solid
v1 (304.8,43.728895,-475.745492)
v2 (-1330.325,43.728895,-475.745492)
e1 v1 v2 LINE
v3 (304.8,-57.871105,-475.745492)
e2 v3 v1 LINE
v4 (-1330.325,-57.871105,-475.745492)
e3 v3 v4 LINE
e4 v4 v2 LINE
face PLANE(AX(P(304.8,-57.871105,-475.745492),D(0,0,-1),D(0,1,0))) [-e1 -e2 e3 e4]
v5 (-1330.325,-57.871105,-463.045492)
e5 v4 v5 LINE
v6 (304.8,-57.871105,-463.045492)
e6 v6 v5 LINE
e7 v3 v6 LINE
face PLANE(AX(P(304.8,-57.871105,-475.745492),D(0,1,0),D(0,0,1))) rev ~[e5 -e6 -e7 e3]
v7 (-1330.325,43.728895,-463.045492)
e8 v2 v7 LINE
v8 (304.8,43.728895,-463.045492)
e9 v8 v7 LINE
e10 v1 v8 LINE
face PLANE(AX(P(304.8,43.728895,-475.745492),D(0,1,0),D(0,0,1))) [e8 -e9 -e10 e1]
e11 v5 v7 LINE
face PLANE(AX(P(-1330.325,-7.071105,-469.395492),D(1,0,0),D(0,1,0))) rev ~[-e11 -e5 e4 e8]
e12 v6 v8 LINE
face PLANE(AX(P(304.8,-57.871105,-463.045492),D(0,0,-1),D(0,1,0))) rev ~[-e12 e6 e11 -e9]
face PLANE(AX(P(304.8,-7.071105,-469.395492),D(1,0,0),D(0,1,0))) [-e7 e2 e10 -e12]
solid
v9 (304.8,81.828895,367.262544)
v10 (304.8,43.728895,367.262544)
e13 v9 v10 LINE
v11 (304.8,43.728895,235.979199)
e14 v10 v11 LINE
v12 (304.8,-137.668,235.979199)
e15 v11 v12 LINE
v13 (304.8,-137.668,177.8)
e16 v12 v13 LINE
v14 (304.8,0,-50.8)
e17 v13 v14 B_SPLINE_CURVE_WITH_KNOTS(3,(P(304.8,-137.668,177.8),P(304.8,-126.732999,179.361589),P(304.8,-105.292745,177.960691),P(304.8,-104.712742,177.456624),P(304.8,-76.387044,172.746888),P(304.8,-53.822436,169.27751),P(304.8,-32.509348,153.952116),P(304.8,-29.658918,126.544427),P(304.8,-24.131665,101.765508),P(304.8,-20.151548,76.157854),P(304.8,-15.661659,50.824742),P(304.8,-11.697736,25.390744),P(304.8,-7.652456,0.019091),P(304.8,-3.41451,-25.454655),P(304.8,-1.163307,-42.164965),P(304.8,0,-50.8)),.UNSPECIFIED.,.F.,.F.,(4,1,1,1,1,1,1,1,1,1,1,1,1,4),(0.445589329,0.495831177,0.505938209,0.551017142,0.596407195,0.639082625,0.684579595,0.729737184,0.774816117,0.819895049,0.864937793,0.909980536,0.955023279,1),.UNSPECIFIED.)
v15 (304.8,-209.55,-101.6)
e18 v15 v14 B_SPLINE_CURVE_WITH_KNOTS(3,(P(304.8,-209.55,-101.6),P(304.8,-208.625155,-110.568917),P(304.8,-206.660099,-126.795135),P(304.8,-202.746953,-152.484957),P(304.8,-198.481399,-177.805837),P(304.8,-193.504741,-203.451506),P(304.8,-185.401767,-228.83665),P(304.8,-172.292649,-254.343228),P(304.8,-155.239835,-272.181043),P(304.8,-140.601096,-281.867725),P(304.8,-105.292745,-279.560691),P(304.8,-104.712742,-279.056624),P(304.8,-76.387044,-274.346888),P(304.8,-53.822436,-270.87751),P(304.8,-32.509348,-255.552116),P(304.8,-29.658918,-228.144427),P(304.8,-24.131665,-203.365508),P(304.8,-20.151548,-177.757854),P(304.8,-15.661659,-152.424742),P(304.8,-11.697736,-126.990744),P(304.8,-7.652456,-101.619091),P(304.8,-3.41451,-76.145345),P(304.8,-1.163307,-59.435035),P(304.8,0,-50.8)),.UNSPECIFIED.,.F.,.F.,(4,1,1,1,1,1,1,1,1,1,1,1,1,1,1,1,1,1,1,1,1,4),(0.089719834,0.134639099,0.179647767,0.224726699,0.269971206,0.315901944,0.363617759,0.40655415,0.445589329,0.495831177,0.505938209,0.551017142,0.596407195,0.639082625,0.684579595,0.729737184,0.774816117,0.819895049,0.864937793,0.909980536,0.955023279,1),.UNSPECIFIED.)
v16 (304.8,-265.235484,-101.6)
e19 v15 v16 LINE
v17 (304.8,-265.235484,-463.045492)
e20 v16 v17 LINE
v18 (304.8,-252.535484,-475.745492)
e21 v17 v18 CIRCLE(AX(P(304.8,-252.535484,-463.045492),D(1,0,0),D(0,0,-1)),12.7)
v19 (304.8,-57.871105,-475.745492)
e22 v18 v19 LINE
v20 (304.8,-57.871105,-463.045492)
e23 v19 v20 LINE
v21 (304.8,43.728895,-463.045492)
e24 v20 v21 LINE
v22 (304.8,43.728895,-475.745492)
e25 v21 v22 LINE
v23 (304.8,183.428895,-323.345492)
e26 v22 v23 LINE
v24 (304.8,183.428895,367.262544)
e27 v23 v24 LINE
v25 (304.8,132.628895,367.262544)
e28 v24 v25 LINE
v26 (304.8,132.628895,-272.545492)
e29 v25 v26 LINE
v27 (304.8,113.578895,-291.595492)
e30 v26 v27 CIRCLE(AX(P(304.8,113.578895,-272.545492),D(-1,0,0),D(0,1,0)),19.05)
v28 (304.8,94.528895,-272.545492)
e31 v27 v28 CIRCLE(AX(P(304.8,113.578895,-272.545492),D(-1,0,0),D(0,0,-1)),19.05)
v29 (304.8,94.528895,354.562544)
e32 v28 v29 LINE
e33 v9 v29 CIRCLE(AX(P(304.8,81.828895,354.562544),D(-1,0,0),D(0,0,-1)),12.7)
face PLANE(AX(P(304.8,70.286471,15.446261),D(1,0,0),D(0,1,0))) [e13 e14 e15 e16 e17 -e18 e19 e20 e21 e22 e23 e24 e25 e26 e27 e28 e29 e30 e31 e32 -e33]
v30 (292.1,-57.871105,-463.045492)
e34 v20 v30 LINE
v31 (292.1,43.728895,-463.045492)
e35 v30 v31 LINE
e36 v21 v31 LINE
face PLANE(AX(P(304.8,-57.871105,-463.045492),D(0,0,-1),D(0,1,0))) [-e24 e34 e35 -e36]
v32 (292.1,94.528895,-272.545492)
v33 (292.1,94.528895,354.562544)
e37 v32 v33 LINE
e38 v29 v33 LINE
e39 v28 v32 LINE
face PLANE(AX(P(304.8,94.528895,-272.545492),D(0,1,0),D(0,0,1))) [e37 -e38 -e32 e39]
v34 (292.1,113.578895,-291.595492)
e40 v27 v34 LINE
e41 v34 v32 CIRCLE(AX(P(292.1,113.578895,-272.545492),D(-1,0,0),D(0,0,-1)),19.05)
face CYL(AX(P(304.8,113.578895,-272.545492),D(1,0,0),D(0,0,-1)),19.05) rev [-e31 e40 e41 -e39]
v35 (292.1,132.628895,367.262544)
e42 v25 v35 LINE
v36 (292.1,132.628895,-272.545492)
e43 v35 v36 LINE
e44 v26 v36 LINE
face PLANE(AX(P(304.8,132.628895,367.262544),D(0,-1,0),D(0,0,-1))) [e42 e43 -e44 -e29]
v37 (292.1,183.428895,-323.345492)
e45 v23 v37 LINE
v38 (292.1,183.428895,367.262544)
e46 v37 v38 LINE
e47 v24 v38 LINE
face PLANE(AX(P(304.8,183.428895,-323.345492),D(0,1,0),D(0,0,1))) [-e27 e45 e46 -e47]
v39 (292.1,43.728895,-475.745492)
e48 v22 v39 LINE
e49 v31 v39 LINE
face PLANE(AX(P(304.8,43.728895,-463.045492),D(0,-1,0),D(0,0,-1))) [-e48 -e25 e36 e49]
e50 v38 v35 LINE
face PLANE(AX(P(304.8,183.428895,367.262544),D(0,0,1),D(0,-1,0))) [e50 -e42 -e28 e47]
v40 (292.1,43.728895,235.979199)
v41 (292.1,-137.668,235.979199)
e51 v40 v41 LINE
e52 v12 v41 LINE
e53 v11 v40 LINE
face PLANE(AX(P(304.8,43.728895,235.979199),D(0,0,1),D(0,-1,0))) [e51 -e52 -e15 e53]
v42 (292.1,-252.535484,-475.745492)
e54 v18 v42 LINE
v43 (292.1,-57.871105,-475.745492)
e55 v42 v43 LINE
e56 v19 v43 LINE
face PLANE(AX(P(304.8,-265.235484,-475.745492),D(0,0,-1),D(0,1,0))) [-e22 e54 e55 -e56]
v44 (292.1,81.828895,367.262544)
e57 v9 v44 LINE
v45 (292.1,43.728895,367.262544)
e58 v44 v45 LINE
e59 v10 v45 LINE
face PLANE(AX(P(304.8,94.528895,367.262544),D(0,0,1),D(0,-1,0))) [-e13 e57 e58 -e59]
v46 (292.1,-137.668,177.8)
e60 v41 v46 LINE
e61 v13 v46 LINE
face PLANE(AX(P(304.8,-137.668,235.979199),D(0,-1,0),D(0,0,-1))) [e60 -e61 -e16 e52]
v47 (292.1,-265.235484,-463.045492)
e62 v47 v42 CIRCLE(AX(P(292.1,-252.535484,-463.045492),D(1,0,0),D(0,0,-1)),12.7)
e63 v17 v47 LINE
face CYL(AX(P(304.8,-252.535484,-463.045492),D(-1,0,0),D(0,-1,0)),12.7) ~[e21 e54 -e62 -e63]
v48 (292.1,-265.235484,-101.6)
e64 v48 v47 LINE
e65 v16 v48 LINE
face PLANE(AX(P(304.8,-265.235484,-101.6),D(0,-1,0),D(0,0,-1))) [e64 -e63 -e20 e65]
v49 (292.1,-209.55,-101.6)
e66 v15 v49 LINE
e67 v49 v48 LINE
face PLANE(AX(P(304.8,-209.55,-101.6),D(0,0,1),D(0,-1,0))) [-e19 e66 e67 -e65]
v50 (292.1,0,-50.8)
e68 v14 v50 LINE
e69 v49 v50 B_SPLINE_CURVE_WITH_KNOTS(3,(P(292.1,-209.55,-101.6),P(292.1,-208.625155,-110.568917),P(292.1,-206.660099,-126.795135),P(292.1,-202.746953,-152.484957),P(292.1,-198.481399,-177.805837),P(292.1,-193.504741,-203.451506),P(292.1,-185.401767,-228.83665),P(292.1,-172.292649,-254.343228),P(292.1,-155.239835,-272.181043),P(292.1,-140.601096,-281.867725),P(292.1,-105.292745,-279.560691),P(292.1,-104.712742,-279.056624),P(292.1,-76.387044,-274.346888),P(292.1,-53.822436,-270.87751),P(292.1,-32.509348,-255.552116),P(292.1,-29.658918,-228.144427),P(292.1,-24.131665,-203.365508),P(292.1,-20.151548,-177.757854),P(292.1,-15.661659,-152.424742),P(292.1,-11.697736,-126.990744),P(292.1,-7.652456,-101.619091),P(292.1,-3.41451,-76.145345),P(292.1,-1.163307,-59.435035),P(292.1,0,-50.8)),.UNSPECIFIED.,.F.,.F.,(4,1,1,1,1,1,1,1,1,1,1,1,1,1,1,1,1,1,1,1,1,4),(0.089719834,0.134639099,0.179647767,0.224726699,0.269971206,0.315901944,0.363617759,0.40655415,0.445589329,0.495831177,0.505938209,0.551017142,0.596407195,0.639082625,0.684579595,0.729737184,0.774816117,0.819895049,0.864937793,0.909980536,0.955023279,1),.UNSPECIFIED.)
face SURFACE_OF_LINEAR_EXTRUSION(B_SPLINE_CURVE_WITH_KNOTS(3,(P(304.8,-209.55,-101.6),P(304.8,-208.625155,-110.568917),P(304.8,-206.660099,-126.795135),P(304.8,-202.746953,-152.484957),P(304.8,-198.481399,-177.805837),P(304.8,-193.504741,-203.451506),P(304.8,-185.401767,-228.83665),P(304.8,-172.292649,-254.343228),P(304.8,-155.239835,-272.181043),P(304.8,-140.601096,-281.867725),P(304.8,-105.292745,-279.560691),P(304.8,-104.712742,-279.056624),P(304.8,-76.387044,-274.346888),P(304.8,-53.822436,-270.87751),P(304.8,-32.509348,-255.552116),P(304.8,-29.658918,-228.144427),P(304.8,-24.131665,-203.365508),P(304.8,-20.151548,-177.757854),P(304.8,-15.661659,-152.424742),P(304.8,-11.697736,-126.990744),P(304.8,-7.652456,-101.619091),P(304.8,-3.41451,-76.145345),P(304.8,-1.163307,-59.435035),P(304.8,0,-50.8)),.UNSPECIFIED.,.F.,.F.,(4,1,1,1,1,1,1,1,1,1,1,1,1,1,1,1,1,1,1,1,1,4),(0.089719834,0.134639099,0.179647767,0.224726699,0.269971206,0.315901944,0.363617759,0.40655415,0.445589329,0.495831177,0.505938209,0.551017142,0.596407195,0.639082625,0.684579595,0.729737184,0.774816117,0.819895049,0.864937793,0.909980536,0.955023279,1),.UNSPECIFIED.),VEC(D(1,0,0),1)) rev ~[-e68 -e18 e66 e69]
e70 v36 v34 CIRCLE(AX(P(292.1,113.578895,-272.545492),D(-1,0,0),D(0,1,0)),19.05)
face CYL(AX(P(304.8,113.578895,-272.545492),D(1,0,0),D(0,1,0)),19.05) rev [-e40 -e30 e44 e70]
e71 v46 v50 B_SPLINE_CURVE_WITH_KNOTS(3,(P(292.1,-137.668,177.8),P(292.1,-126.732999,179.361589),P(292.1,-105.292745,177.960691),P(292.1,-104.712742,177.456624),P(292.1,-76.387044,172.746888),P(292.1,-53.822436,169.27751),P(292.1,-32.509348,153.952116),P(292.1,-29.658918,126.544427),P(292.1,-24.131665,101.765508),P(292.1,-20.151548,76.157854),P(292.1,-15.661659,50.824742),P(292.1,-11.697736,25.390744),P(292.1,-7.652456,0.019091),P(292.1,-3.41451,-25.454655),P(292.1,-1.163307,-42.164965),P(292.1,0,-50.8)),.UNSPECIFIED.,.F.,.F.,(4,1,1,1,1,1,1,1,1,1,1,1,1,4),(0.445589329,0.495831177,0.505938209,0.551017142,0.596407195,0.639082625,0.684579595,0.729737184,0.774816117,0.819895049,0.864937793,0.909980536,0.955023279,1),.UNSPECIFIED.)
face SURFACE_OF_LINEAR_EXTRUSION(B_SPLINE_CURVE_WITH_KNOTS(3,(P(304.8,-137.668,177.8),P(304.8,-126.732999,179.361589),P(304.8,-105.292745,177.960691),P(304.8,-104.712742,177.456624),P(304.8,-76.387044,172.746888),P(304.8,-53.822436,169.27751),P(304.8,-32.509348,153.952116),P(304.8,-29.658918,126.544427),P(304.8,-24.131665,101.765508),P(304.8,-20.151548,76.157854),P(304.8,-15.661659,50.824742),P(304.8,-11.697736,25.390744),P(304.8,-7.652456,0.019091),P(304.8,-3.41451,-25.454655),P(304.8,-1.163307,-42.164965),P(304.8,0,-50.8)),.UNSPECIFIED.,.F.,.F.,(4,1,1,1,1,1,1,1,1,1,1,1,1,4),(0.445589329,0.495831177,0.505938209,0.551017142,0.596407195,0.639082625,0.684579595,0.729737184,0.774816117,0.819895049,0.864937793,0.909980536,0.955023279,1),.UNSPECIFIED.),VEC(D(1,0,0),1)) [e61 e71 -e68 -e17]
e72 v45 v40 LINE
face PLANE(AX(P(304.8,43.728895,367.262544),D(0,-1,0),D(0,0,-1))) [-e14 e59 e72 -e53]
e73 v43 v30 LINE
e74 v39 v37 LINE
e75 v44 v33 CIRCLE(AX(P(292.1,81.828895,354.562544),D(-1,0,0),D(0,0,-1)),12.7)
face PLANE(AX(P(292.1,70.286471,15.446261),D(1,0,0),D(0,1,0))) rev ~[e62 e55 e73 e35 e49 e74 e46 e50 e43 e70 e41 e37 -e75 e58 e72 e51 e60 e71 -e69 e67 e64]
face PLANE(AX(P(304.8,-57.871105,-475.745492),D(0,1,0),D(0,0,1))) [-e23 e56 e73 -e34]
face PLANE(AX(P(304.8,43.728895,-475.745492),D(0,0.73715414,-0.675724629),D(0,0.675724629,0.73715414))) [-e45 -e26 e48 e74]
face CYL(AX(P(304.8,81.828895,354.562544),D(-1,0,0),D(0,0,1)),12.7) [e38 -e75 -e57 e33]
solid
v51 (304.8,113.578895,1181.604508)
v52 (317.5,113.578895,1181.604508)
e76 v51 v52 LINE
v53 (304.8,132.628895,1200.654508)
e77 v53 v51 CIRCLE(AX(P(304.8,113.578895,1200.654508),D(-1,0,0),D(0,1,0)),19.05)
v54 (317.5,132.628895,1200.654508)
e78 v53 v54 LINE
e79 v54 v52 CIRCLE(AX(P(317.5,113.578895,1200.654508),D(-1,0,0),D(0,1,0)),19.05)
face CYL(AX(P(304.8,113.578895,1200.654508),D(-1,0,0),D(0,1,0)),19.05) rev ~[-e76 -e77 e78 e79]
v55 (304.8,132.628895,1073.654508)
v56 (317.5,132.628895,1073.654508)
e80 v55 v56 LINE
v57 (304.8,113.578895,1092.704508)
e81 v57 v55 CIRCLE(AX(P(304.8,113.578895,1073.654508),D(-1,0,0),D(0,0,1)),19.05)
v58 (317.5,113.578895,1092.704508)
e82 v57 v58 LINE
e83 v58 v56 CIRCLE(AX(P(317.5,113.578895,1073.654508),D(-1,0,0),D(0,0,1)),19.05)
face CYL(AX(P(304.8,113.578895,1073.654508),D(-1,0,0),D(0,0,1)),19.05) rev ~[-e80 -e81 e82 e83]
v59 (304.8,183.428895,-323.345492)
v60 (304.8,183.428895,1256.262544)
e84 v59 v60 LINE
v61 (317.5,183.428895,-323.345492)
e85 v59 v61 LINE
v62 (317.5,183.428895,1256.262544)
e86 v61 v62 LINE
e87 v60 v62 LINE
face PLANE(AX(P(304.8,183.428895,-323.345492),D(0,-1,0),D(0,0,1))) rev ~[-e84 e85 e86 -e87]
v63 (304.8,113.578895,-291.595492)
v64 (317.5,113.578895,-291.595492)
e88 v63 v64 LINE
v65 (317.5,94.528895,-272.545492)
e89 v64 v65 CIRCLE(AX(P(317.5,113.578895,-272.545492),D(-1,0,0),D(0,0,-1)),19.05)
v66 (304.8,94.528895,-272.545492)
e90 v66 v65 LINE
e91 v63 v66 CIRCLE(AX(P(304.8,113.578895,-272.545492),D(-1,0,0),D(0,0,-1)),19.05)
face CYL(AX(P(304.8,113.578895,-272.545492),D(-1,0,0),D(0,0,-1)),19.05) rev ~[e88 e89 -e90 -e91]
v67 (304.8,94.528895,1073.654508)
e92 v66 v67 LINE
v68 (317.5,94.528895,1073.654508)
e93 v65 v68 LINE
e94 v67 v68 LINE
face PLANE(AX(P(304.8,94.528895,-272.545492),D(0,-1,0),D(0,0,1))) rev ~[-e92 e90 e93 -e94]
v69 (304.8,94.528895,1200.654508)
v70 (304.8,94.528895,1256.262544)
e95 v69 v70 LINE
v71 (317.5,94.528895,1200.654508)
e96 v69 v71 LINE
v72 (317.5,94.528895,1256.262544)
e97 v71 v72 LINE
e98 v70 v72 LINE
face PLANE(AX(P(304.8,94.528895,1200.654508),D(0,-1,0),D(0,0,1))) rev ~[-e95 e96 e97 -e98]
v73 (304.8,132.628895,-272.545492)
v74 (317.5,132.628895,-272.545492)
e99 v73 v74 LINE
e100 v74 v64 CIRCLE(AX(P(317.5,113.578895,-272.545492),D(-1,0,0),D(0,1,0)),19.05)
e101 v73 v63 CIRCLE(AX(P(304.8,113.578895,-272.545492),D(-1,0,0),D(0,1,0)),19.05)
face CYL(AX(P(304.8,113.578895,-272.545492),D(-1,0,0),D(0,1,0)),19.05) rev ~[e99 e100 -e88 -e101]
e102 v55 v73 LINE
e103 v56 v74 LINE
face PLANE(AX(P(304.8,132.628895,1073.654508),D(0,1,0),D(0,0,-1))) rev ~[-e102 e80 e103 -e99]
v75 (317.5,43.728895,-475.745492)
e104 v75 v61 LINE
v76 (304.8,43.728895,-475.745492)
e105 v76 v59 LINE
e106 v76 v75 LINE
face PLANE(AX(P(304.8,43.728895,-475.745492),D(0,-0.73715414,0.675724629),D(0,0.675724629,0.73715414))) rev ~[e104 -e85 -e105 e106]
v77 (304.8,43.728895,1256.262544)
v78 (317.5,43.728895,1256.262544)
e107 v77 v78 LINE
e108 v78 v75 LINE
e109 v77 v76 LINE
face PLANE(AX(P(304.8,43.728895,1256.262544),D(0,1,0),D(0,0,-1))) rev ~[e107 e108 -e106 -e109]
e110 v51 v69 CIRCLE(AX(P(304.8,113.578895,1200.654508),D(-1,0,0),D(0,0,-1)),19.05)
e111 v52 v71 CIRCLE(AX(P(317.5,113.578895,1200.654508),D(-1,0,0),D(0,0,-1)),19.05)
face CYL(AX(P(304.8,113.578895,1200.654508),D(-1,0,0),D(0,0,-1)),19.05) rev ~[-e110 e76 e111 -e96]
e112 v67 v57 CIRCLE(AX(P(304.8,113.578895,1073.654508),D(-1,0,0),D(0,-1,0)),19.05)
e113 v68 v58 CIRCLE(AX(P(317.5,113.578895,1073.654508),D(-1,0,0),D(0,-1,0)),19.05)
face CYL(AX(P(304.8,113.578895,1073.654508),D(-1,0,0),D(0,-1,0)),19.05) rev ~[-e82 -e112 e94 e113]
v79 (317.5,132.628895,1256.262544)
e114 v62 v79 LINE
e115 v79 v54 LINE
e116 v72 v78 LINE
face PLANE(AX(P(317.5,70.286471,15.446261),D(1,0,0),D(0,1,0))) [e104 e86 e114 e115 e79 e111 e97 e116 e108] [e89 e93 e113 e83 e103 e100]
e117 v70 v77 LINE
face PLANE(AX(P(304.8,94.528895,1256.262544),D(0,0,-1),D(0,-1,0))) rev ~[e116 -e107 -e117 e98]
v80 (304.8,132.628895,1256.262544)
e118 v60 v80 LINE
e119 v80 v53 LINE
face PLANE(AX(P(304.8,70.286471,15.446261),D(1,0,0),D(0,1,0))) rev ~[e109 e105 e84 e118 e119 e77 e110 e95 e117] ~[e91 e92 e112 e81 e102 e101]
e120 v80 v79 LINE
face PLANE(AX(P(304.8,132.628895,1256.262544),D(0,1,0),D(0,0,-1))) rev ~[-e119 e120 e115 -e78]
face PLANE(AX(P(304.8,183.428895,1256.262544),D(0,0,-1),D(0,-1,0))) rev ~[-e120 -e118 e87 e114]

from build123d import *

# Parameters (mm, degrees)
F2_DEPTH = 12.7
F3_DEPTH = 12.7
F4_R     = 12.7
F1_W     = 101.6
F1_H     = 12.7
F5_DEPTH = 1635.125


# Not quite as in the source:
# - a feature names something its author has since deleted; it is built from what else it names


with BuildPart() as f2:
    # F1 (on offset) → F2 (new body)
    with BuildSketch(Plane.YZ.offset(304.8)):
        with BuildLine():
            Line((94.5288948266, 367.2625439401), (43.7288948266, 367.2625439401))
            Line((43.7288948266, 367.2625439401), (43.7288948266, 235.9791994095))
            Line((43.7288948266, 235.9791994095), (43.7288948266, -323.3454918831))
            Line((43.7288948266, -323.3454918831), (113.5788948266, -323.3454918831))
            Line((113.5788948266, -323.3454918831), (113.5788948266, -291.5954918831))
            ThreePointArc((113.5788948266, -291.5954918831), (100.108510645, -286.0158760647), (94.5288948266, -272.5454918831))
            Line((94.5288948266, -272.5454918831), (94.5288948266, 367.2625439401))
        make_face()
        with BuildLine():
            Line((113.5788948266, -291.5954918831), (113.5788948266, -323.3454918831))
            Line((113.5788948266, -323.3454918831), (183.4288948266, -323.3454918831))
            Line((183.4288948266, -323.3454918831), (183.4288948266, 367.2625439401))
            Line((183.4288948266, 367.2625439401), (132.6288948266, 367.2625439401))
            Line((132.6288948266, 367.2625439401), (132.6288948266, -272.5454918831))
            ThreePointArc((132.6288948266, -272.5454918831), (127.0492790082, -286.0158760647), (113.5788948266, -291.5954918831))
        make_face()
        Polygon((113.5788948266, -323.3454918831), (43.7288948266, -323.3454918831), (43.7288948266, -463.0454918831), (43.7288948266, -475.7454918831), (183.4288948266, -323.3454918831), align=None)
        with BuildLine():
            Line((43.7288948266, 1256.2625439401), (43.7288948266, 367.2625439401))
            Line((43.7288948266, 367.2625439401), (94.5288948266, 367.2625439401))
            Line((94.5288948266, 367.2625439401), (94.5288948266, 1073.6545081169))
            ThreePointArc((94.5288948266, 1073.6545081169), (100.108510645, 1087.1248922985), (113.5788948266, 1092.7045081169))
            Line((113.5788948266, 1092.7045081169), (113.5788948266, 1181.6045081169))
            ThreePointArc((113.5788948266, 1181.6045081169), (100.108510645, 1187.1841239353), (94.5288948266, 1200.6545081169))
            Line((94.5288948266, 1200.6545081169), (94.5288948266, 1256.2625439401))
            Line((94.5288948266, 1256.2625439401), (43.7288948266, 1256.2625439401))
        make_face()
        with BuildLine():
            Line((113.5788948266, 1181.6045081169), (113.5788948266, 1092.7045081169))
            ThreePointArc((113.5788948266, 1092.7045081169), (127.0492790082, 1087.1248922985), (132.6288948266, 1073.6545081169))
            Line((132.6288948266, 1073.6545081169), (132.6288948266, 367.2625439401))
            Line((132.6288948266, 367.2625439401), (183.4288948266, 367.2625439401))
            Line((183.4288948266, 367.2625439401), (183.4288948266, 1256.2625439401))
            Line((183.4288948266, 1256.2625439401), (132.6288948266, 1256.2625439401))
            Line((132.6288948266, 1256.2625439401), (132.6288948266, 1200.6545081169))
            ThreePointArc((132.6288948266, 1200.6545081169), (127.0492790082, 1187.1841239353), (113.5788948266, 1181.6045081169))
        make_face()
    extrude(amount=F2_DEPTH)


with BuildPart() as f3:
    # F1 (on offset) → F3 (new body)
    with BuildSketch(Plane.YZ.offset(304.8)):
        with BuildLine():
            Line((94.5288948266, 367.2625439401), (43.7288948266, 367.2625439401))
            Line((43.7288948266, 367.2625439401), (43.7288948266, 235.9791994095))
            Line((43.7288948266, 235.9791994095), (43.7288948266, -323.3454918831))
            Line((43.7288948266, -323.3454918831), (113.5788948266, -323.3454918831))
            Line((113.5788948266, -323.3454918831), (113.5788948266, -291.5954918831))
            ThreePointArc((113.5788948266, -291.5954918831), (100.108510645, -286.0158760647), (94.5288948266, -272.5454918831))
            Line((94.5288948266, -272.5454918831), (94.5288948266, 367.2625439401))
        make_face()
        with BuildLine():
            Line((113.5788948266, -291.5954918831), (113.5788948266, -323.3454918831))
            Line((113.5788948266, -323.3454918831), (183.4288948266, -323.3454918831))
            Line((183.4288948266, -323.3454918831), (183.4288948266, 367.2625439401))
            Line((183.4288948266, 367.2625439401), (132.6288948266, 367.2625439401))
            Line((132.6288948266, 367.2625439401), (132.6288948266, -272.5454918831))
            ThreePointArc((132.6288948266, -272.5454918831), (127.0492790082, -286.0158760647), (113.5788948266, -291.5954918831))
        make_face()
        Polygon((113.5788948266, -323.3454918831), (43.7288948266, -323.3454918831), (43.7288948266, -463.0454918831), (43.7288948266, -475.7454918831), (183.4288948266, -323.3454918831), align=None)
        with BuildLine():
            Line((43.7288948266, -323.3454918831), (43.7288948266, 235.9791994095))
            Line((43.7288948266, 235.9791994095), (-137.668, 235.9791994095))
            Line((-137.668, 235.9791994095), (-137.668, 177.8))
            add(Edge.make_bspline(
                [(-137.668, 177.8), (-126.7329989699, 179.3615885186), (-105.2927447568, 177.9606906514), (-104.7127420428, 177.4566242644), (-76.3870444308, 172.7468877699), (-53.8224361201, 169.2775097956), (-32.509347536, 153.9521162966), (-29.6589175986, 126.5444267311), (-24.1316654123, 101.7655079647), (-20.1515477066, 76.1578540031), (-15.6616591497, 50.824742265), (-11.697736498, 25.3907441448), (-7.6524561633, 0.0190908821), (-3.4145104905, -25.4546553024), (-1.1633071199, -42.1649645919), (0, -50.8)],
                knots=[0.4455893289, 0.4455893289, 0.4455893289, 0.4455893289, 0.4958311767, 0.5059382093, 0.5510171418, 0.5964071949, 0.6390826252, 0.6845795949, 0.7297371842, 0.7748161167, 0.8198950491, 0.8649377925, 0.9099805359, 0.9550232793, 1, 1, 1, 1], degree=3))
            add(Edge.make_bspline(
                [(-209.55, -101.6), (-208.6251552358, -110.5689174615), (-206.6600994581, -126.7951349357), (-202.7469529896, -152.4849572895), (-198.4813992324, -177.8058366363), (-193.5047411073, -203.4515063023), (-185.4017669459, -228.8366501901), (-172.2926489077, -254.3432279678), (-155.2398352434, -272.1810431706), (-140.6010964135, -281.8677246091), (-105.2927447568, -279.5606906514), (-104.7127420428, -279.0566242644), (-76.3870444308, -274.3468877699), (-53.8224361201, -270.8775097956), (-32.509347536, -255.5521162966), (-29.6589175986, -228.1444267311), (-24.1316654123, -203.3655079647), (-20.1515477066, -177.7578540031), (-15.6616591497, -152.424742265), (-11.697736498, -126.9907441448), (-7.6524561633, -101.6190908821), (-3.4145104905, -76.1453446976), (-1.1633071199, -59.4350354081), (0, -50.8)],
                knots=[0.0897198342, 0.0897198342, 0.0897198342, 0.0897198342, 0.1346390991, 0.1796477671, 0.2247266995, 0.269971206, 0.3159019443, 0.3636177586, 0.4065541502, 0.4455893289, 0.4958311767, 0.5059382093, 0.5510171418, 0.5964071949, 0.6390826252, 0.6845795949, 0.7297371842, 0.7748161167, 0.8198950491, 0.8649377925, 0.9099805359, 0.9550232793, 1, 1, 1, 1], degree=3))
            Line((-209.55, -101.6), (-265.2354836464, -101.6))
            Line((-265.2354836464, -101.6), (-265.2354836464, -475.7454918831))
            Line((-265.2354836464, -475.7454918831), (-57.8711051734, -475.7454918831))
            Line((-57.8711051734, -475.7454918831), (-57.8711051734, -463.0454918831))
            Line((-57.8711051734, -463.0454918831), (43.7288948266, -463.0454918831))
            Line((43.7288948266, -463.0454918831), (43.7288948266, -323.3454918831))
        make_face()
    extrude(amount=-F3_DEPTH)

    # F4
    f4_edges = [f3.edges().sort_by_distance(p)[0] for p in [
        (298.45, -265.235484, -475.745492),
        (298.45, 94.528895, 367.262544),
    ]]
    fillet(f4_edges, radius=F4_R)


with BuildPart() as f5:
    # F1 (on offset) → F5 (new body)
    with BuildSketch(Plane.YZ.offset(304.8)):
        with Locations((-7.0711051734, -469.3954918831)):
            Rectangle(F1_W, F1_H)
    extrude(amount=-F5_DEPTH)


solid = Compound([f2.part, f3.part, f5.part])
